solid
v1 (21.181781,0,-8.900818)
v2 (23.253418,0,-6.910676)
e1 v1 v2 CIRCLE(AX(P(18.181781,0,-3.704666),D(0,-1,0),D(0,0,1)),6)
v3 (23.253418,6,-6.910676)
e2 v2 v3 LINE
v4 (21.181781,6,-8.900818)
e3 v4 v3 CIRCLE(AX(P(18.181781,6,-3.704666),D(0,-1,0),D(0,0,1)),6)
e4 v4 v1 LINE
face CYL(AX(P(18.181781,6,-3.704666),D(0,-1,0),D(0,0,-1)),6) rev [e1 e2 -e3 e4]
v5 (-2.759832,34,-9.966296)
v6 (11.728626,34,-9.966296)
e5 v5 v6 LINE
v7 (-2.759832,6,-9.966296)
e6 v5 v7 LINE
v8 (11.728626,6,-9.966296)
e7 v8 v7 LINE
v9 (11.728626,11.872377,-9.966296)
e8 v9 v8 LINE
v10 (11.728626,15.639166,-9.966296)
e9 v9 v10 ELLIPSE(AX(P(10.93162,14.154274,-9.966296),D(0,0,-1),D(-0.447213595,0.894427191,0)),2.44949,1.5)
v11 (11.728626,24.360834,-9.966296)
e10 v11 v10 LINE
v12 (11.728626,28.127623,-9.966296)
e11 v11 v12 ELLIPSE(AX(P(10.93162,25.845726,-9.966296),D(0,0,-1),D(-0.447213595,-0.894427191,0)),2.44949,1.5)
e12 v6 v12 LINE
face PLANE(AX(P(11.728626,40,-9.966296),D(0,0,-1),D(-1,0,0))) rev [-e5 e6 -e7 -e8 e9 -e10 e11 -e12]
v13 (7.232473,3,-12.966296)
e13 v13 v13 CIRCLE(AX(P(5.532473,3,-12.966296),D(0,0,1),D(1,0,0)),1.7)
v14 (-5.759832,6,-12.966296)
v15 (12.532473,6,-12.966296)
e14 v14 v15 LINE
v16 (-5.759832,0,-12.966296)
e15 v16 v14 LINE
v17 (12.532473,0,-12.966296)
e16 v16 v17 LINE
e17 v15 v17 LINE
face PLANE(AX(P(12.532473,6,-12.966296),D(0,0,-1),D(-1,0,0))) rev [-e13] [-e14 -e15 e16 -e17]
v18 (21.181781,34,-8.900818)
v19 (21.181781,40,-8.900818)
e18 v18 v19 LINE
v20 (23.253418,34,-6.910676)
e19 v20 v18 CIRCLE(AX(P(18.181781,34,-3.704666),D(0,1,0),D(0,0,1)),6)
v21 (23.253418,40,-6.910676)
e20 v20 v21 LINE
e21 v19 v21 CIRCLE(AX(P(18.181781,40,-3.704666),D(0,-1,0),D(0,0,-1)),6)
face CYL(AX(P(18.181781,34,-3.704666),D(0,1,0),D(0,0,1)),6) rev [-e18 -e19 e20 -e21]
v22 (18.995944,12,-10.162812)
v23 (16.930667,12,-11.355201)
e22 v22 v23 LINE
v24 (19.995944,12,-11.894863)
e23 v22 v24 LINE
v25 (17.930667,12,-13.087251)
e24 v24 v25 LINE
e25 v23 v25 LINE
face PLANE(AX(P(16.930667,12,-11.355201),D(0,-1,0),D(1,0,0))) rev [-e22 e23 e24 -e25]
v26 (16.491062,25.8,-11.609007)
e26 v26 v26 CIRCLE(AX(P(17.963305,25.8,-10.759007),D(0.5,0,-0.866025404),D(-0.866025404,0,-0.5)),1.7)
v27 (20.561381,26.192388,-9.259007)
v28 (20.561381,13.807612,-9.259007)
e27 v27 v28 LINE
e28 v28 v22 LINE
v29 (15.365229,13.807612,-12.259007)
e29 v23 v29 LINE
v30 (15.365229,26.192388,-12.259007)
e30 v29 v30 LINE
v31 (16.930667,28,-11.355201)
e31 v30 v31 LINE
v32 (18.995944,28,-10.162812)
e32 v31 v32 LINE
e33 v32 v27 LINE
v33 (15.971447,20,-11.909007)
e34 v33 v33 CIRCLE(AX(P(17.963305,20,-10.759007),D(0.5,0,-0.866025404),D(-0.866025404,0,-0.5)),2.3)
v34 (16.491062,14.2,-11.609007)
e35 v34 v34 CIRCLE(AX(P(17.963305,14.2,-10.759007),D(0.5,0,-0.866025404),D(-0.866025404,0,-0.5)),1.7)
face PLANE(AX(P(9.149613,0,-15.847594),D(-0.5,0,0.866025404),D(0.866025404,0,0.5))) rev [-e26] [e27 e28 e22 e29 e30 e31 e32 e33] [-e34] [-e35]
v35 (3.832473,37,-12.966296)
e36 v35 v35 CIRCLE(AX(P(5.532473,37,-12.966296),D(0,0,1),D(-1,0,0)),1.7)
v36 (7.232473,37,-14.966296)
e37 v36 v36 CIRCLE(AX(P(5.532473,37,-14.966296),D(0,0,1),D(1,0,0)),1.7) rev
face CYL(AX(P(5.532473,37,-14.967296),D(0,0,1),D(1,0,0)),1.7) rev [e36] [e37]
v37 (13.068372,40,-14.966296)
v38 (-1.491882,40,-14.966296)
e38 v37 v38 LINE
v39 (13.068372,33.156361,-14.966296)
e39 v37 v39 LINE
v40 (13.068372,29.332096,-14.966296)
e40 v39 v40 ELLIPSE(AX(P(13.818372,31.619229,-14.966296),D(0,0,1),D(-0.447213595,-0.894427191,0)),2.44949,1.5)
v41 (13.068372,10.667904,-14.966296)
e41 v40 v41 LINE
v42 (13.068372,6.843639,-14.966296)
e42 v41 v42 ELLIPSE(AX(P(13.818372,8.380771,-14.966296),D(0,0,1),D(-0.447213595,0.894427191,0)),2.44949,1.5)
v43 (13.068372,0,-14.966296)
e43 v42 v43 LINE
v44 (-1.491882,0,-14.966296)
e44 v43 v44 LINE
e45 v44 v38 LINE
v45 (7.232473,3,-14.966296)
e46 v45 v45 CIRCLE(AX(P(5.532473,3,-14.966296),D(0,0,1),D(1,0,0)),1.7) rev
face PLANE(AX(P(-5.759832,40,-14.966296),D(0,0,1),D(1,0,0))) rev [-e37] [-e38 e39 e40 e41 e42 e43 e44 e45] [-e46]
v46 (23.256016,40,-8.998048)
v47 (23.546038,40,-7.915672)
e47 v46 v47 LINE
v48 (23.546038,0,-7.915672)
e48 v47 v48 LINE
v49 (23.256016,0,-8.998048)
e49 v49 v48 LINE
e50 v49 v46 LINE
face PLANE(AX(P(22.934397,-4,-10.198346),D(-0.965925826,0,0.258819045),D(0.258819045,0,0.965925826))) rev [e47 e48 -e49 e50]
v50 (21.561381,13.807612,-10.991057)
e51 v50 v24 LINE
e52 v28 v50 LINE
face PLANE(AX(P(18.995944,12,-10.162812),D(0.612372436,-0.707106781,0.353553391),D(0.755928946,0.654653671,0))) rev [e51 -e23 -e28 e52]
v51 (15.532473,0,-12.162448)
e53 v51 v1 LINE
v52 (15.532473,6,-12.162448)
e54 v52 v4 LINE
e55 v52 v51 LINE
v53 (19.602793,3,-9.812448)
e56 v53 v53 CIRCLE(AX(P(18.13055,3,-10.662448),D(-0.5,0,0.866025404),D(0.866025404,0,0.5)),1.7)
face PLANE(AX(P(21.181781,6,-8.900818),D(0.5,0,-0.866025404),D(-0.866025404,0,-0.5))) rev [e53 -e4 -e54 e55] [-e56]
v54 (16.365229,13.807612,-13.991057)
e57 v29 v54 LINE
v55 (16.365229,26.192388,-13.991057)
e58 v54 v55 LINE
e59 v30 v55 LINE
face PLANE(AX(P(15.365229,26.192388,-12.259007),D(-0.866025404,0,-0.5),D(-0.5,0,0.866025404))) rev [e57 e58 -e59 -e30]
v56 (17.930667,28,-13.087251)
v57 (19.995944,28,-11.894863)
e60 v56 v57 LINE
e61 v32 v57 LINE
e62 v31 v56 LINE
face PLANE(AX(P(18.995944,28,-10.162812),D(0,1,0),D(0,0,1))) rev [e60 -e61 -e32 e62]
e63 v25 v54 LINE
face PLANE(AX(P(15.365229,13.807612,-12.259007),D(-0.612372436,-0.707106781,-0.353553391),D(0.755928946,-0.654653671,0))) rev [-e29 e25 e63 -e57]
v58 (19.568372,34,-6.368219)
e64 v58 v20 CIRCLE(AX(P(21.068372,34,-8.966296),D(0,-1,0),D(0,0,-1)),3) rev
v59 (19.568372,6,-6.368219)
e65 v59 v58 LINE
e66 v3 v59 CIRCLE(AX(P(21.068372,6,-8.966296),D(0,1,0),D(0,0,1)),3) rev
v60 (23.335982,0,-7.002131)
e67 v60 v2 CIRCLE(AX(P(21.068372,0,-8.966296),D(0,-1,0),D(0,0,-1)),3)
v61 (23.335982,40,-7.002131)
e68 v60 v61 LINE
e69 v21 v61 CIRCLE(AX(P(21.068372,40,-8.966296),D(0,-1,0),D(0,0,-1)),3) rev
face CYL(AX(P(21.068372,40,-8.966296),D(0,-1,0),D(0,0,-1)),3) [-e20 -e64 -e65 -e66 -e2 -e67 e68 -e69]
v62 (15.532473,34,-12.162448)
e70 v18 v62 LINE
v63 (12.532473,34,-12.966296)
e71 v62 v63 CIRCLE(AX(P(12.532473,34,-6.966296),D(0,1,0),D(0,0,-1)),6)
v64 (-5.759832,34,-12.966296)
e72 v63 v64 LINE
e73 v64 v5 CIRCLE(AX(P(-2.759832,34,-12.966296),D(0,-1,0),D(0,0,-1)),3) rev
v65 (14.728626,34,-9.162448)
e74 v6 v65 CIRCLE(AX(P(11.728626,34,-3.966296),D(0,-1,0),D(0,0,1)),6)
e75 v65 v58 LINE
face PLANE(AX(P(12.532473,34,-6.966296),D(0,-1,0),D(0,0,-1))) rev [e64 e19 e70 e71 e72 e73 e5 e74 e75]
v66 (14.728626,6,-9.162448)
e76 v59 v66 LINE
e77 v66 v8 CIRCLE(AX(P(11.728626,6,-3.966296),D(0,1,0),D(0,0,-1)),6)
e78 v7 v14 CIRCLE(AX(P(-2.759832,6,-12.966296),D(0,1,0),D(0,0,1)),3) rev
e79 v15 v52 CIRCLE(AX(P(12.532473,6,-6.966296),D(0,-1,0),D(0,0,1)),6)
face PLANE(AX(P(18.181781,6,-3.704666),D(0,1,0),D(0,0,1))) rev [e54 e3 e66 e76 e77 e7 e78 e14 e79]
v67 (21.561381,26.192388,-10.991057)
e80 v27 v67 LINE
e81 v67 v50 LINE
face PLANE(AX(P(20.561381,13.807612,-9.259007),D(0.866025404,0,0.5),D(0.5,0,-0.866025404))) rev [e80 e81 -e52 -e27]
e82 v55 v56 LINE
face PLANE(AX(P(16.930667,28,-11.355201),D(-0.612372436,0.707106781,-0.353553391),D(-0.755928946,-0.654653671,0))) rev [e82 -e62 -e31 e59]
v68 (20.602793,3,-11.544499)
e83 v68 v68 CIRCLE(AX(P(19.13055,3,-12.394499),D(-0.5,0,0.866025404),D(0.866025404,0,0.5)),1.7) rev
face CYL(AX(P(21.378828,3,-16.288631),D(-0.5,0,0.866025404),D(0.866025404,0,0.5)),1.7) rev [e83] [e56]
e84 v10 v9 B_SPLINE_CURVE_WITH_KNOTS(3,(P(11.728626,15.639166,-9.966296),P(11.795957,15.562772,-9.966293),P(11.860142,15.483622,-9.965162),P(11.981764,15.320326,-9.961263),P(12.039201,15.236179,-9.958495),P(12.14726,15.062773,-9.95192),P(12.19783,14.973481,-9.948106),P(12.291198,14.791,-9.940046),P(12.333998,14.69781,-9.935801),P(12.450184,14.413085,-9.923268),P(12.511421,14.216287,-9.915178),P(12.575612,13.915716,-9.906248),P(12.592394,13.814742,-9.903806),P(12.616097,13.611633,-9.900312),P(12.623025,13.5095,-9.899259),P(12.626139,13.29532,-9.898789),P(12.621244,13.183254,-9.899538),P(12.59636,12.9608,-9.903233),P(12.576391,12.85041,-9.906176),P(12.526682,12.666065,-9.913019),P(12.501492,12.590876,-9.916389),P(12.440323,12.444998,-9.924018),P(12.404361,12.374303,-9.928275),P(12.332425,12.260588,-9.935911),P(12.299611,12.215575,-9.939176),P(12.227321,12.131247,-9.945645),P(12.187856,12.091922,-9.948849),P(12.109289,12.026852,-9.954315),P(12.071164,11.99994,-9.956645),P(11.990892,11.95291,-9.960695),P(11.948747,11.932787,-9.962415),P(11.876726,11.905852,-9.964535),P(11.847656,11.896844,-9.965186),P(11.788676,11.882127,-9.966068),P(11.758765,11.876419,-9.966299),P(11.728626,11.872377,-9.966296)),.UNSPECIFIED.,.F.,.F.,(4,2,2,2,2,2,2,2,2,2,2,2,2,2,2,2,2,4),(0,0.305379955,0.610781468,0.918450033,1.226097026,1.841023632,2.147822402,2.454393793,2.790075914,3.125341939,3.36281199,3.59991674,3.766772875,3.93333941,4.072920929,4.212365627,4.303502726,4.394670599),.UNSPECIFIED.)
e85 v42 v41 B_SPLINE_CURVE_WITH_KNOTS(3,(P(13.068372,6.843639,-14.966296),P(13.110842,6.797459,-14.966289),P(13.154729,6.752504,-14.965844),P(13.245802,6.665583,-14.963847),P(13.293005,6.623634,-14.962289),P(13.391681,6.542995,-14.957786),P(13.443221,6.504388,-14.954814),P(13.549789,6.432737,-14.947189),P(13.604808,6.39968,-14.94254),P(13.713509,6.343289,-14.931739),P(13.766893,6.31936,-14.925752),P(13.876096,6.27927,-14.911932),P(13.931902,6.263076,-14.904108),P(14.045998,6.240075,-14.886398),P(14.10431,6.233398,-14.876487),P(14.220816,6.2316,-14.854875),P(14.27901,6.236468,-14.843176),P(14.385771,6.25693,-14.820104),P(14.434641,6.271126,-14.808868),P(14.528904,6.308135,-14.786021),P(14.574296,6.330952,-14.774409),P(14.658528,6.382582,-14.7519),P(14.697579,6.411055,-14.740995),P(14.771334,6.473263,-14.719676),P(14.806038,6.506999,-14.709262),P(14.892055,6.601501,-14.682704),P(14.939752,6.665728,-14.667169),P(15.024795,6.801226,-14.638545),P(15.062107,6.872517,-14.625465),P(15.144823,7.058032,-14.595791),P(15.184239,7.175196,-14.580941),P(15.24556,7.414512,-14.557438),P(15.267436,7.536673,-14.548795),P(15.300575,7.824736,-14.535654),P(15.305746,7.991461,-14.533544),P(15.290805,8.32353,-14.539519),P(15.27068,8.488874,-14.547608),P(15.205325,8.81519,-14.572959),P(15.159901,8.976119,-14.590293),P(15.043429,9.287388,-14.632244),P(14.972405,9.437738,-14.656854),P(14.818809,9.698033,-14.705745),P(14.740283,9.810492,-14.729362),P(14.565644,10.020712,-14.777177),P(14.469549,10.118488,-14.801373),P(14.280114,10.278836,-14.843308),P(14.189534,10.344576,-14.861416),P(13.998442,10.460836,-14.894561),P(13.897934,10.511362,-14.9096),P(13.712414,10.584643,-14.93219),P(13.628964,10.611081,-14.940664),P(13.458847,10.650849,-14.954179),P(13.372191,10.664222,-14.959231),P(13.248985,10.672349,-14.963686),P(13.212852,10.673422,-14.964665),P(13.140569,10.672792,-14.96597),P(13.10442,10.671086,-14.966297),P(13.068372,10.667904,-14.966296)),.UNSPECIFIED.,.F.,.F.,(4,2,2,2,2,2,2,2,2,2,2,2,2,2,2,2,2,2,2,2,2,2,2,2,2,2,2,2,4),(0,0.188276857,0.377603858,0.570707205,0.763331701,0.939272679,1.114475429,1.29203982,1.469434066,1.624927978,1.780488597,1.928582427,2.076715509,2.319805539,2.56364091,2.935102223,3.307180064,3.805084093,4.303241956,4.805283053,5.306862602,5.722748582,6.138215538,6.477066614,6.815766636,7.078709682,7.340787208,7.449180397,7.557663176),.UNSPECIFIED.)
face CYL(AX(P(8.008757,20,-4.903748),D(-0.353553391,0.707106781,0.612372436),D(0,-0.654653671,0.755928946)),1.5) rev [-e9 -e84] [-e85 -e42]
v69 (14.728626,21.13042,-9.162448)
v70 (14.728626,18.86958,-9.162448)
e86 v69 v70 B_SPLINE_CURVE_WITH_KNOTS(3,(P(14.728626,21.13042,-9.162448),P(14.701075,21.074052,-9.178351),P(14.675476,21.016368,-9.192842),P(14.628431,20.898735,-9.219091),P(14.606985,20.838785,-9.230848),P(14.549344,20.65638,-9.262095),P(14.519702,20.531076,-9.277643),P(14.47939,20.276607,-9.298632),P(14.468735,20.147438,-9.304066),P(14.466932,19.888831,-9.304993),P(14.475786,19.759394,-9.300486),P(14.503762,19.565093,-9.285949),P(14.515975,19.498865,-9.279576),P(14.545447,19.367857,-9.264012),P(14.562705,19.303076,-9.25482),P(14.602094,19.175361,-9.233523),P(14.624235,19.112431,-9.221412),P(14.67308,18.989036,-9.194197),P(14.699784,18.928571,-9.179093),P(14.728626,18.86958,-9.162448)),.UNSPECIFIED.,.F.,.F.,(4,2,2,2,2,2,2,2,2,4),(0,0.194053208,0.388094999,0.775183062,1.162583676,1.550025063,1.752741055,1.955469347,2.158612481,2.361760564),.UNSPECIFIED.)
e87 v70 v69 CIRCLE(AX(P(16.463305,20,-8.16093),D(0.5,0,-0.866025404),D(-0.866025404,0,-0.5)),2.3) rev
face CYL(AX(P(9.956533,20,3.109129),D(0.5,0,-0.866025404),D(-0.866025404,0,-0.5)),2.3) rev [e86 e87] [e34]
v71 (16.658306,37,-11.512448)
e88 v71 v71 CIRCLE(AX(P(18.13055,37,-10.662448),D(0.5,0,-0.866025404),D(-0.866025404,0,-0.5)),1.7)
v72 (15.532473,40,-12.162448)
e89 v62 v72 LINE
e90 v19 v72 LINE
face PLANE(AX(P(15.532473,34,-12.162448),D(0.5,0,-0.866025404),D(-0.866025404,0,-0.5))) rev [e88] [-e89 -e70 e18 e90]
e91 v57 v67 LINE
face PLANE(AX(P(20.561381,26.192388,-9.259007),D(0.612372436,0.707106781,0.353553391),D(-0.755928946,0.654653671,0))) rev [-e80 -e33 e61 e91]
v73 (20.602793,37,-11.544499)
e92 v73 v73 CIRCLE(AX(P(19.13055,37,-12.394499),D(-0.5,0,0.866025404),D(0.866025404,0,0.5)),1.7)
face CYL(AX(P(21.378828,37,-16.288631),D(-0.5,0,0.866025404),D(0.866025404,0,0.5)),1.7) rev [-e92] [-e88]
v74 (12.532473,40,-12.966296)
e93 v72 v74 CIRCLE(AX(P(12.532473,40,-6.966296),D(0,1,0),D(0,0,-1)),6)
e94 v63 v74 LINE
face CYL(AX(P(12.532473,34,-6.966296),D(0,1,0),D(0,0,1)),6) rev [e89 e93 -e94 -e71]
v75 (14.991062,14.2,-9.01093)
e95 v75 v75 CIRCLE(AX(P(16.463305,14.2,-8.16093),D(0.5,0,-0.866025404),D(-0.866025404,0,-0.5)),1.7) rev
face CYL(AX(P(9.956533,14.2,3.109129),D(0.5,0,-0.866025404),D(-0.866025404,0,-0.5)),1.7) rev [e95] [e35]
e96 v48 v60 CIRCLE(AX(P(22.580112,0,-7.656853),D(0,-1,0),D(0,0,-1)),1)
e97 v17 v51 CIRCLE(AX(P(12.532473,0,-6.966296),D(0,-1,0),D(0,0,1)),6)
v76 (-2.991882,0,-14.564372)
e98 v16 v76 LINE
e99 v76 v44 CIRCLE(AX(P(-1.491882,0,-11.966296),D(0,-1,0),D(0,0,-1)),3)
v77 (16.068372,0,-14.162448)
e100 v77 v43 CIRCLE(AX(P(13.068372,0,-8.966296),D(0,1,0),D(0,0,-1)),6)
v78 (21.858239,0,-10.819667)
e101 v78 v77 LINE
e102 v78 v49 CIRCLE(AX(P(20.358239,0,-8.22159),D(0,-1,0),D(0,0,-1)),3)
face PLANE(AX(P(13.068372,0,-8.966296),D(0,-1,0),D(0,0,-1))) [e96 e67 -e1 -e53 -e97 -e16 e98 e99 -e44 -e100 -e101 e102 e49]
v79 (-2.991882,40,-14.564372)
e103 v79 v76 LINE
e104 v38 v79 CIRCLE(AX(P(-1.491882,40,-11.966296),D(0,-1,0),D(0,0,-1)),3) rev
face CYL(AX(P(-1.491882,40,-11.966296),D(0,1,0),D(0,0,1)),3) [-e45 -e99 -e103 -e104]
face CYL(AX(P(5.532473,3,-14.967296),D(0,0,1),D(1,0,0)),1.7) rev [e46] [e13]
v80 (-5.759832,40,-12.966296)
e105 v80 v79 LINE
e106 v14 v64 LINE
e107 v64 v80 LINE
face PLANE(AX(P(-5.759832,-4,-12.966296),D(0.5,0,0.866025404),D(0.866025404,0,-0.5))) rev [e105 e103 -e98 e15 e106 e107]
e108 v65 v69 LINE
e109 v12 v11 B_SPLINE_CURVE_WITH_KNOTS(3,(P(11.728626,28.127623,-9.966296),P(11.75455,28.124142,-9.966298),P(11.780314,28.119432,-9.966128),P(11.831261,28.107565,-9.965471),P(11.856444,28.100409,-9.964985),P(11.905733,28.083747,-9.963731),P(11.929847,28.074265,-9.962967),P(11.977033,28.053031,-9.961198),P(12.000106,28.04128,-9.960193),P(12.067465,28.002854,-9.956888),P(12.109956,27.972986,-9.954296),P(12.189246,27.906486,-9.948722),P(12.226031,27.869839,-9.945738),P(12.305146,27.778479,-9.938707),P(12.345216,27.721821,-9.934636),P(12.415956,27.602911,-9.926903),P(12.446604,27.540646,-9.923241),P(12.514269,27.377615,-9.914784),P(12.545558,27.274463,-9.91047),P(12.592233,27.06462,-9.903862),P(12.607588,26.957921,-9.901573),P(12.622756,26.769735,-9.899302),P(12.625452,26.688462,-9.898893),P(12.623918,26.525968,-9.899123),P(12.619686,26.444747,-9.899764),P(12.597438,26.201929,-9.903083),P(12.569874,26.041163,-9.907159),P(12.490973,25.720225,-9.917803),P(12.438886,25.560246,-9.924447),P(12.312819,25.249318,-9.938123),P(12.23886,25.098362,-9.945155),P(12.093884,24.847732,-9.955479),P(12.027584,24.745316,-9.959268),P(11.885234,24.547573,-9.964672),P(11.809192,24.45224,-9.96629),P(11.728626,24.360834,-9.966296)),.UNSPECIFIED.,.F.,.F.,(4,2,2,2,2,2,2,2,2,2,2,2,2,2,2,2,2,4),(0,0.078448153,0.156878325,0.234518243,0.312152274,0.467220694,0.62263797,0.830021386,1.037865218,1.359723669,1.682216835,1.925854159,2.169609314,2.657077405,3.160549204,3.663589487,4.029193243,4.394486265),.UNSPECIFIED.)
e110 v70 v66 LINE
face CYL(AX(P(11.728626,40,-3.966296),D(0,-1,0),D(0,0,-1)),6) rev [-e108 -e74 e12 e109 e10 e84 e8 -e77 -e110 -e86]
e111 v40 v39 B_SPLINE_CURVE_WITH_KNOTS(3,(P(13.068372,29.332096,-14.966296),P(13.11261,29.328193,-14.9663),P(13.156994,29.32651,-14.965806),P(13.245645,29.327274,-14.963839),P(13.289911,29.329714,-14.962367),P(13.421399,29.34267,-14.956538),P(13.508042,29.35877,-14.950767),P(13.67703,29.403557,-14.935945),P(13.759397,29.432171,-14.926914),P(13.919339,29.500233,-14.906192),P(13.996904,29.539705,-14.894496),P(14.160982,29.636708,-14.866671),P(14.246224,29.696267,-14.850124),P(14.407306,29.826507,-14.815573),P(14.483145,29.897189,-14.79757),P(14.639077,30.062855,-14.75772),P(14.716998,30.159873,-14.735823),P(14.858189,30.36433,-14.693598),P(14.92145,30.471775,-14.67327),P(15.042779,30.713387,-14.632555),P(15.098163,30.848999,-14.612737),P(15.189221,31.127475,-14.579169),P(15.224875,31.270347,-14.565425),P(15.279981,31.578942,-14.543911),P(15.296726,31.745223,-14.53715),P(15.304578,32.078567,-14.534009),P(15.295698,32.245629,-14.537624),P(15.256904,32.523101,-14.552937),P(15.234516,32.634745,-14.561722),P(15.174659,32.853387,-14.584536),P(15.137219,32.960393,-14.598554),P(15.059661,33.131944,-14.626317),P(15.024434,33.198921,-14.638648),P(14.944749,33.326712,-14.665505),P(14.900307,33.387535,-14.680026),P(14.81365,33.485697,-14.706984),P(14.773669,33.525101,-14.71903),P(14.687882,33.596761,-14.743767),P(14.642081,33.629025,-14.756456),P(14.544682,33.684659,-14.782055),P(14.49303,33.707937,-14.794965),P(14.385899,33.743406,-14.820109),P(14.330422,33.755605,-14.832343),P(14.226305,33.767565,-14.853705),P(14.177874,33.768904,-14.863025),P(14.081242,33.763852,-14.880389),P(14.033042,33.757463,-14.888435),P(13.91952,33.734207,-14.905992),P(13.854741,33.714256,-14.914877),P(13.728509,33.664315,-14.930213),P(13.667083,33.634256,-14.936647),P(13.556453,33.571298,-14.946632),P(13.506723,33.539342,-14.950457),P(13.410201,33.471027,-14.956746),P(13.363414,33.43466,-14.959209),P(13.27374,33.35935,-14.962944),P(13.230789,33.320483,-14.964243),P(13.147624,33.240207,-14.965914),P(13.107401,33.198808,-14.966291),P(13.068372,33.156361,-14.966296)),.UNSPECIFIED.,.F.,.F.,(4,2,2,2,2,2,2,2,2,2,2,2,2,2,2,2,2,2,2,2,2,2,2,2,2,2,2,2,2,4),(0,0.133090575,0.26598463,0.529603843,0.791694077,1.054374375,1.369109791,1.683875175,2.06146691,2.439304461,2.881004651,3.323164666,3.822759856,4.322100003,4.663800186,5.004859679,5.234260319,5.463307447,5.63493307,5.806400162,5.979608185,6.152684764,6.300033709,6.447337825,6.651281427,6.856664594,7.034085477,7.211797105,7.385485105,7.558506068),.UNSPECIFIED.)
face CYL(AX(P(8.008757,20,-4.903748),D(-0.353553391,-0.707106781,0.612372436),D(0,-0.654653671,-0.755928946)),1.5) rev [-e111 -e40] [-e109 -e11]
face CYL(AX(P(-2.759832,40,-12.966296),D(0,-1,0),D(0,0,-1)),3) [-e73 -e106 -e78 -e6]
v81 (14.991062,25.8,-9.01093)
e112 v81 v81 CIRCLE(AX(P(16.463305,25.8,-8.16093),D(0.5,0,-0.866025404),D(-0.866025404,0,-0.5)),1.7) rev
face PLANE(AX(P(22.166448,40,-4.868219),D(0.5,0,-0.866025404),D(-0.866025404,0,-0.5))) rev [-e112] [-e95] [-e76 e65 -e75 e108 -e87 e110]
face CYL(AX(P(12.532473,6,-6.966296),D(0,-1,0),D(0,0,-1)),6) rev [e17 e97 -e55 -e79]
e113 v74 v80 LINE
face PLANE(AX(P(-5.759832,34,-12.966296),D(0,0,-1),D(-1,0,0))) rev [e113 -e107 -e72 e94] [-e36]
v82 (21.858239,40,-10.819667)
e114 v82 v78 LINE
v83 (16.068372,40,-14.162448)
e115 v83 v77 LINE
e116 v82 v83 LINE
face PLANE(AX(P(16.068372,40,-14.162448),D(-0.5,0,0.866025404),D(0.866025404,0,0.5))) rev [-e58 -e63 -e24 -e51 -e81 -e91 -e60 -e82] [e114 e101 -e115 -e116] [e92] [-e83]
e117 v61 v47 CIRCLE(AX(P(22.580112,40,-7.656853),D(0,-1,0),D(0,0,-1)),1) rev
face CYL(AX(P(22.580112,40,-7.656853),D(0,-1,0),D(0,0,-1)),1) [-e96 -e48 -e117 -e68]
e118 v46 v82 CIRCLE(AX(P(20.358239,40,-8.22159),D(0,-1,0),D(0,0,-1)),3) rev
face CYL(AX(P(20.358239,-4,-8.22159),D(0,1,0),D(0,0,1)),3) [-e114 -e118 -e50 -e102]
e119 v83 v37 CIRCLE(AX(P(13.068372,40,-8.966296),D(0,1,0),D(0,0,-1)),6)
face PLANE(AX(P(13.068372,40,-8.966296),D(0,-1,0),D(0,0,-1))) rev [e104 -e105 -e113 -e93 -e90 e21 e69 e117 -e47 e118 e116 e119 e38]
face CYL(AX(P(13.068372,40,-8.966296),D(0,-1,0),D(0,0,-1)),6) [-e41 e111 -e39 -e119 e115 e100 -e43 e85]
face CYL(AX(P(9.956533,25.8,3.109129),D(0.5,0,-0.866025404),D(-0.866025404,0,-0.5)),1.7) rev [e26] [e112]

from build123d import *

# Parameters (mm, degrees)
AUFSATZ_LINEAR_AUSTRAGEN1_DEPTH  = 40
SCHNITT_LINEAR_AUSTRAGEN3_DEPTH  = 40
SCHNITT_LINEAR_START             = -6
SCHNITT_LINEAR_AUSTRAGEN4_DEPTH  = 6
SCHNITT_LINEAR_AUSTRAGEN5_DEPTH  = 6
VERRUNDUNG1_R                    = 3
SCHNITT_LINEAR_AUSTRAGEN6_REACH  = 45.817
SKIZZE5_R                        = 1.7
SCHNITT_LINEAR_AUSTRAGEN7_REACH  = 49.001
SKIZZE6_R                        = 1.7
SCHNITT_ROTATION_D_NN1_START     = 26.307192439
SCHNITT_ROTATION_D_NN1_OUTLINE_R = 1.5
SCHNITT_ROTATION_D_NN1_DEPTH     = 11.713572656
SCHNITT_ROTATION_D_NN2_START     = -1.977078808
SCHNITT_ROTATION_D_NN2_OUTLINE_R = 1.5
SCHNITT_ROTATION_D_NN2_DEPTH     = 11.713571611
VERRUNDUNG2_R                    = 1
SCHNITT_LINEAR_AUSTRAGEN8_DEPTH  = 2
SCHNITT_LINEAR_AUSTRAGEN9_REACH  = 45.817
SKIZZE10_R                       = 2.3
SKIZZE10_R_2                     = 1.7


# Read off the part's stored shape, not the designer's step: Schnitt-Rotation-Dünn1, Schnitt-Rotation-Dünn2
with BuildPart() as part:
    # Skizze1 → Aufsatz-Linear austragen1 (new body)
    with BuildSketch(Plane(origin=(0, 0, 0), x_dir=(1, 0, 0), z_dir=(0, 1, 0))):
        with BuildLine():
            Line((-5.759831503, 14.966295554), (13.068371728, 14.966295554))
            ThreePointArc((13.068371728, 14.966295554), (14.621285998, 14.761850511), (16.068371728, 14.162447976))
            Line((16.068371728, 14.162447976), (24.666447939, 9.198346361))
            Line((24.666447939, 9.198346361), (22.166447939, 4.868219342))
            Line((22.166447939, 4.868219342), (14.728625766, 9.162447976))
            ThreePointArc((14.728625766, 9.162447976), (13.281540036, 9.761850511), (11.728625766, 9.966295554))
            Line((11.728625766, 9.966295554), (-5.759831503, 9.966295554))
            Line((-5.759831503, 9.966295554), (-5.759831503, 14.966295554))
        make_face()
    extrude(amount=AUFSATZ_LINEAR_AUSTRAGEN1_DEPTH)

    # Skizze2 → Schnitt-Linear austragen3 (cut)
    with BuildSketch(Plane(origin=(0, 40, 0), x_dir=(1, 0, 0), z_dir=(0, 1, 0))):
        Polygon((-5.759831503, 14.966295554), (-5.759831503, 12.966295554), (-2.295729887, 14.966295554), align=None)
        Polygon((24.666447939, 9.198346361), (22.934397132, 10.198346361), (23.666447939, 7.466295554), align=None)
    extrude(amount=-SCHNITT_LINEAR_AUSTRAGEN3_DEPTH, mode=Mode.SUBTRACT)

    # Skizze3 → Schnitt-Linear austragen4 (cut)
    with BuildSketch(Plane(origin=(0, 40, 0), x_dir=(1, 0, 0), z_dir=(0, 1, 0)).offset(SCHNITT_LINEAR_START)):
        with BuildLine():
            Line((-5.759831503, 12.966295554), (12.532473343, 12.966295554))
            ThreePointArc((12.532473343, 12.966295554), (14.085387613, 12.761850511), (15.532473343, 12.162447976))
            Line((15.532473343, 12.162447976), (21.181781368, 8.900818467))
            ThreePointArc((21.181781368, 8.900818467), (23.993765179, 5.194915748), (23.31194468, 0.593167307))
            Line((23.31194468, 0.593167307), (22.166447939, 4.868219342))
            Line((22.166447939, 4.868219342), (14.728625766, 9.162447976))
            ThreePointArc((14.728625766, 9.162447976), (13.281540036, 9.761850511), (11.728625766, 9.966295554))
            Line((11.728625766, 9.966295554), (-5.759831503, 9.966295554))
            Line((-5.759831503, 9.966295554), (-5.759831503, 12.966295554))
        make_face()
    extrude(amount=SCHNITT_LINEAR_AUSTRAGEN4_DEPTH, mode=Mode.SUBTRACT)

    # Skizze4 → Schnitt-Linear austragen5 (cut)
    with BuildSketch(Plane.XZ):
        with BuildLine():
            Line((21.181781368, -8.900818467), (15.532473343, -12.162447976))
            ThreePointArc((15.532473343, -12.162447976), (14.085387614, -12.761850511), (12.532473343, -12.966295554))
            Line((12.532473343, -12.966295554), (-5.759831503, -12.966295554))
            Line((-5.759831503, -12.966295554), (-5.759831503, -9.966295554))
            Line((-5.759831503, -9.966295554), (11.728625766, -9.966295554))
            ThreePointArc((11.728625766, -9.966295554), (13.281540036, -9.761850511), (14.728625766, -9.162447976))
            Line((14.728625766, -9.162447976), (22.166447939, -4.868219342))
            Line((22.166447939, -4.868219342), (23.31194468, -0.593167307))
            ThreePointArc((23.31194468, -0.593167307), (23.993765179, -5.194915748), (21.181781368, -8.900818467))
        make_face()
    extrude(amount=-SCHNITT_LINEAR_AUSTRAGEN5_DEPTH, mode=Mode.SUBTRACT)

    # Verrundung1
    verrundung1_edges = [part.edges().sort_by_distance(p)[0] for p in [
        (22.934397132, 20, -10.198346361),
        (-2.295729887, 20, -14.966295554),
        (22.166447939, 20, -4.868219342),
        (-5.759831503, 20, -9.966295554),
    ]]
    fillet(verrundung1_edges, radius=VERRUNDUNG1_R - 0.0001)  # a hair under: the kernel refuses the full size

    # Skizze5 → Schnitt-Linear austragen6 (cut, up to next)
    with BuildSketch(Plane(origin=(9.149612796, 0, -15.847594231), x_dir=(0.8660254037844386, 0, 0.5000000000000003), z_dir=(-0.5000000000000002, 0, 0.8660254037844385)), mode=Mode.PRIVATE) as schnitt_linear_austragen6_sk1:
        with Locations((10.37029251, 3)):
            Circle(SKIZZE5_R)
    schnitt_linear_austragen6_tool1 = extrude(schnitt_linear_austragen6_sk1.sketch, amount=-SCHNITT_LINEAR_AUSTRAGEN6_REACH, mode=Mode.PRIVATE) & part.part
    # Skizze5 → Schnitt-Linear austragen6 (cut, up to next)
    with BuildSketch(Plane(origin=(9.149612796, 0, -15.847594231), x_dir=(0.8660254037844386, 0, 0.5000000000000003), z_dir=(-0.5000000000000002, 0, 0.8660254037844385)), mode=Mode.PRIVATE) as schnitt_linear_austragen6_sk2:
        with Locations((10.37029251, 37)):
            Circle(SKIZZE5_R)
    schnitt_linear_austragen6_tool2 = extrude(schnitt_linear_austragen6_sk2.sketch, amount=-SCHNITT_LINEAR_AUSTRAGEN6_REACH, mode=Mode.PRIVATE) & part.part
    add(schnitt_linear_austragen6_tool1.solids().sort_by_distance((18.13055, 3, -10.662448))[0], mode=Mode.SUBTRACT)
    add(schnitt_linear_austragen6_tool2.solids().sort_by_distance((18.13055, 37, -10.662448))[0], mode=Mode.SUBTRACT)

    # Skizze6 → Schnitt-Linear austragen7 (cut, up to next)
    with BuildSketch(Plane.XY.offset(-12.966295554), mode=Mode.PRIVATE) as schnitt_linear_austragen7_sk1:
        with Locations((5.532473343, 3)):
            Circle(SKIZZE6_R)
    schnitt_linear_austragen7_tool1 = extrude(schnitt_linear_austragen7_sk1.sketch, amount=-SCHNITT_LINEAR_AUSTRAGEN7_REACH, mode=Mode.PRIVATE) & part.part
    # Skizze6 → Schnitt-Linear austragen7 (cut, up to next)
    with BuildSketch(Plane.XY.offset(-12.966295554), mode=Mode.PRIVATE) as schnitt_linear_austragen7_sk2:
        with Locations((5.532473343, 37)):
            Circle(SKIZZE6_R)
    schnitt_linear_austragen7_tool2 = extrude(schnitt_linear_austragen7_sk2.sketch, amount=-SCHNITT_LINEAR_AUSTRAGEN7_REACH, mode=Mode.PRIVATE) & part.part
    add(schnitt_linear_austragen7_tool1.solids().sort_by_distance((5.532473, 3, -12.966296))[0], mode=Mode.SUBTRACT)
    add(schnitt_linear_austragen7_tool2.solids().sort_by_distance((5.532473, 37, -12.966296))[0], mode=Mode.SUBTRACT)

    # Schnitt-Rotation-Dünn1 outline → Schnitt-Rotation-Dünn1 (cut)
    with BuildSketch(Plane(origin=(0, 0, 0), x_dir=(0.9354143466934868, -0.26726124191241973, 0.23145502494313744), z_dir=(0.35355339059326996, 0.7071067811865439, -0.6123724356958009)).offset(SCHNITT_ROTATION_D_NN1_START)):
        with Locations((1.011284538, -9.386188067)):
            Circle(SCHNITT_ROTATION_D_NN1_OUTLINE_R)
    extrude(amount=SCHNITT_ROTATION_D_NN1_DEPTH, mode=Mode.SUBTRACT)

    # Schnitt-Rotation-Dünn2 outline → Schnitt-Rotation-Dünn2 (cut)
    with BuildSketch(Plane(origin=(0, 0, 0), x_dir=(0.9354143466934868, 0.26726124191241973, 0.23145502494313744), z_dir=(0.35355339059326996, -0.7071067811865439, -0.6123724356958009)).offset(SCHNITT_ROTATION_D_NN2_START)):
        with Locations((11.701734215, -16.799958762)):
            Circle(SCHNITT_ROTATION_D_NN2_OUTLINE_R)
    extrude(amount=SCHNITT_ROTATION_D_NN2_DEPTH, mode=Mode.SUBTRACT)

    # Verrundung2
    verrundung2_edges = [part.edges().sort_by_distance(p)[0] for p in [
        (23.666447939, 20, -7.466295554),
    ]]
    fillet(verrundung2_edges, radius=VERRUNDUNG2_R)

    # Skizze9 → Schnitt-Linear austragen8 (cut)
    with BuildSketch(Plane(origin=(10.149612796, 0, -17.579645039), x_dir=(-0.8660254037844383, 0, -0.5000000000000007), z_dir=(0.5000000000000007, 0, -0.8660254037844383))):
        Polygon((-7.177175397, 26.192388155), (-7.177175397, 13.807611845), (-8.984787242, 12), (-11.369563553, 12), (-13.177175397, 13.807611845), (-13.177175397, 26.192388155), (-11.369563553, 28), (-8.984787242, 28), align=None)
    extrude(amount=-SCHNITT_LINEAR_AUSTRAGEN8_DEPTH, mode=Mode.SUBTRACT)

    # Skizze10 → Schnitt-Linear austragen9 (cut, up to next)
    with BuildSketch(Plane(origin=(9.149612796, 0, -15.847594231), x_dir=(-0.8660254037844384, 0, -0.5000000000000007), z_dir=(0.5000000000000007, 0, -0.8660254037844384)), mode=Mode.PRIVATE) as schnitt_linear_austragen9_sk1:
        with Locations((-10.177175397, 20)):
            Circle(SKIZZE10_R)
    schnitt_linear_austragen9_tool1 = extrude(schnitt_linear_austragen9_sk1.sketch, amount=-SCHNITT_LINEAR_AUSTRAGEN9_REACH, mode=Mode.PRIVATE) & part.part
    # Skizze10 → Schnitt-Linear austragen9 (cut, up to next)
    with BuildSketch(Plane(origin=(9.149612796, 0, -15.847594231), x_dir=(-0.8660254037844384, 0, -0.5000000000000007), z_dir=(0.5000000000000007, 0, -0.8660254037844384)), mode=Mode.PRIVATE) as schnitt_linear_austragen9_sk2:
        with Locations((-10.177175397, 25.8)):
            Circle(SKIZZE10_R_2)
    schnitt_linear_austragen9_tool2 = extrude(schnitt_linear_austragen9_sk2.sketch, amount=-SCHNITT_LINEAR_AUSTRAGEN9_REACH, mode=Mode.PRIVATE) & part.part
    # Skizze10 → Schnitt-Linear austragen9 (cut, up to next)
    with BuildSketch(Plane(origin=(9.149612796, 0, -15.847594231), x_dir=(-0.8660254037844384, 0, -0.5000000000000007), z_dir=(0.5000000000000007, 0, -0.8660254037844384)), mode=Mode.PRIVATE) as schnitt_linear_austragen9_sk3:
        with Locations((-10.177175397, 14.2)):
            Circle(SKIZZE10_R_2)
    schnitt_linear_austragen9_tool3 = extrude(schnitt_linear_austragen9_sk3.sketch, amount=-SCHNITT_LINEAR_AUSTRAGEN9_REACH, mode=Mode.PRIVATE) & part.part
    add(schnitt_linear_austragen9_tool1.solids().sort_by_distance((17.963305, 20, -10.759007))[0], mode=Mode.SUBTRACT)
    add(schnitt_linear_austragen9_tool2.solids().sort_by_distance((17.963305, 25.8, -10.759007))[0], mode=Mode.SUBTRACT)
    add(schnitt_linear_austragen9_tool3.solids().sort_by_distance((17.963305, 14.2, -10.759007))[0], mode=Mode.SUBTRACT)


solid = part.part
